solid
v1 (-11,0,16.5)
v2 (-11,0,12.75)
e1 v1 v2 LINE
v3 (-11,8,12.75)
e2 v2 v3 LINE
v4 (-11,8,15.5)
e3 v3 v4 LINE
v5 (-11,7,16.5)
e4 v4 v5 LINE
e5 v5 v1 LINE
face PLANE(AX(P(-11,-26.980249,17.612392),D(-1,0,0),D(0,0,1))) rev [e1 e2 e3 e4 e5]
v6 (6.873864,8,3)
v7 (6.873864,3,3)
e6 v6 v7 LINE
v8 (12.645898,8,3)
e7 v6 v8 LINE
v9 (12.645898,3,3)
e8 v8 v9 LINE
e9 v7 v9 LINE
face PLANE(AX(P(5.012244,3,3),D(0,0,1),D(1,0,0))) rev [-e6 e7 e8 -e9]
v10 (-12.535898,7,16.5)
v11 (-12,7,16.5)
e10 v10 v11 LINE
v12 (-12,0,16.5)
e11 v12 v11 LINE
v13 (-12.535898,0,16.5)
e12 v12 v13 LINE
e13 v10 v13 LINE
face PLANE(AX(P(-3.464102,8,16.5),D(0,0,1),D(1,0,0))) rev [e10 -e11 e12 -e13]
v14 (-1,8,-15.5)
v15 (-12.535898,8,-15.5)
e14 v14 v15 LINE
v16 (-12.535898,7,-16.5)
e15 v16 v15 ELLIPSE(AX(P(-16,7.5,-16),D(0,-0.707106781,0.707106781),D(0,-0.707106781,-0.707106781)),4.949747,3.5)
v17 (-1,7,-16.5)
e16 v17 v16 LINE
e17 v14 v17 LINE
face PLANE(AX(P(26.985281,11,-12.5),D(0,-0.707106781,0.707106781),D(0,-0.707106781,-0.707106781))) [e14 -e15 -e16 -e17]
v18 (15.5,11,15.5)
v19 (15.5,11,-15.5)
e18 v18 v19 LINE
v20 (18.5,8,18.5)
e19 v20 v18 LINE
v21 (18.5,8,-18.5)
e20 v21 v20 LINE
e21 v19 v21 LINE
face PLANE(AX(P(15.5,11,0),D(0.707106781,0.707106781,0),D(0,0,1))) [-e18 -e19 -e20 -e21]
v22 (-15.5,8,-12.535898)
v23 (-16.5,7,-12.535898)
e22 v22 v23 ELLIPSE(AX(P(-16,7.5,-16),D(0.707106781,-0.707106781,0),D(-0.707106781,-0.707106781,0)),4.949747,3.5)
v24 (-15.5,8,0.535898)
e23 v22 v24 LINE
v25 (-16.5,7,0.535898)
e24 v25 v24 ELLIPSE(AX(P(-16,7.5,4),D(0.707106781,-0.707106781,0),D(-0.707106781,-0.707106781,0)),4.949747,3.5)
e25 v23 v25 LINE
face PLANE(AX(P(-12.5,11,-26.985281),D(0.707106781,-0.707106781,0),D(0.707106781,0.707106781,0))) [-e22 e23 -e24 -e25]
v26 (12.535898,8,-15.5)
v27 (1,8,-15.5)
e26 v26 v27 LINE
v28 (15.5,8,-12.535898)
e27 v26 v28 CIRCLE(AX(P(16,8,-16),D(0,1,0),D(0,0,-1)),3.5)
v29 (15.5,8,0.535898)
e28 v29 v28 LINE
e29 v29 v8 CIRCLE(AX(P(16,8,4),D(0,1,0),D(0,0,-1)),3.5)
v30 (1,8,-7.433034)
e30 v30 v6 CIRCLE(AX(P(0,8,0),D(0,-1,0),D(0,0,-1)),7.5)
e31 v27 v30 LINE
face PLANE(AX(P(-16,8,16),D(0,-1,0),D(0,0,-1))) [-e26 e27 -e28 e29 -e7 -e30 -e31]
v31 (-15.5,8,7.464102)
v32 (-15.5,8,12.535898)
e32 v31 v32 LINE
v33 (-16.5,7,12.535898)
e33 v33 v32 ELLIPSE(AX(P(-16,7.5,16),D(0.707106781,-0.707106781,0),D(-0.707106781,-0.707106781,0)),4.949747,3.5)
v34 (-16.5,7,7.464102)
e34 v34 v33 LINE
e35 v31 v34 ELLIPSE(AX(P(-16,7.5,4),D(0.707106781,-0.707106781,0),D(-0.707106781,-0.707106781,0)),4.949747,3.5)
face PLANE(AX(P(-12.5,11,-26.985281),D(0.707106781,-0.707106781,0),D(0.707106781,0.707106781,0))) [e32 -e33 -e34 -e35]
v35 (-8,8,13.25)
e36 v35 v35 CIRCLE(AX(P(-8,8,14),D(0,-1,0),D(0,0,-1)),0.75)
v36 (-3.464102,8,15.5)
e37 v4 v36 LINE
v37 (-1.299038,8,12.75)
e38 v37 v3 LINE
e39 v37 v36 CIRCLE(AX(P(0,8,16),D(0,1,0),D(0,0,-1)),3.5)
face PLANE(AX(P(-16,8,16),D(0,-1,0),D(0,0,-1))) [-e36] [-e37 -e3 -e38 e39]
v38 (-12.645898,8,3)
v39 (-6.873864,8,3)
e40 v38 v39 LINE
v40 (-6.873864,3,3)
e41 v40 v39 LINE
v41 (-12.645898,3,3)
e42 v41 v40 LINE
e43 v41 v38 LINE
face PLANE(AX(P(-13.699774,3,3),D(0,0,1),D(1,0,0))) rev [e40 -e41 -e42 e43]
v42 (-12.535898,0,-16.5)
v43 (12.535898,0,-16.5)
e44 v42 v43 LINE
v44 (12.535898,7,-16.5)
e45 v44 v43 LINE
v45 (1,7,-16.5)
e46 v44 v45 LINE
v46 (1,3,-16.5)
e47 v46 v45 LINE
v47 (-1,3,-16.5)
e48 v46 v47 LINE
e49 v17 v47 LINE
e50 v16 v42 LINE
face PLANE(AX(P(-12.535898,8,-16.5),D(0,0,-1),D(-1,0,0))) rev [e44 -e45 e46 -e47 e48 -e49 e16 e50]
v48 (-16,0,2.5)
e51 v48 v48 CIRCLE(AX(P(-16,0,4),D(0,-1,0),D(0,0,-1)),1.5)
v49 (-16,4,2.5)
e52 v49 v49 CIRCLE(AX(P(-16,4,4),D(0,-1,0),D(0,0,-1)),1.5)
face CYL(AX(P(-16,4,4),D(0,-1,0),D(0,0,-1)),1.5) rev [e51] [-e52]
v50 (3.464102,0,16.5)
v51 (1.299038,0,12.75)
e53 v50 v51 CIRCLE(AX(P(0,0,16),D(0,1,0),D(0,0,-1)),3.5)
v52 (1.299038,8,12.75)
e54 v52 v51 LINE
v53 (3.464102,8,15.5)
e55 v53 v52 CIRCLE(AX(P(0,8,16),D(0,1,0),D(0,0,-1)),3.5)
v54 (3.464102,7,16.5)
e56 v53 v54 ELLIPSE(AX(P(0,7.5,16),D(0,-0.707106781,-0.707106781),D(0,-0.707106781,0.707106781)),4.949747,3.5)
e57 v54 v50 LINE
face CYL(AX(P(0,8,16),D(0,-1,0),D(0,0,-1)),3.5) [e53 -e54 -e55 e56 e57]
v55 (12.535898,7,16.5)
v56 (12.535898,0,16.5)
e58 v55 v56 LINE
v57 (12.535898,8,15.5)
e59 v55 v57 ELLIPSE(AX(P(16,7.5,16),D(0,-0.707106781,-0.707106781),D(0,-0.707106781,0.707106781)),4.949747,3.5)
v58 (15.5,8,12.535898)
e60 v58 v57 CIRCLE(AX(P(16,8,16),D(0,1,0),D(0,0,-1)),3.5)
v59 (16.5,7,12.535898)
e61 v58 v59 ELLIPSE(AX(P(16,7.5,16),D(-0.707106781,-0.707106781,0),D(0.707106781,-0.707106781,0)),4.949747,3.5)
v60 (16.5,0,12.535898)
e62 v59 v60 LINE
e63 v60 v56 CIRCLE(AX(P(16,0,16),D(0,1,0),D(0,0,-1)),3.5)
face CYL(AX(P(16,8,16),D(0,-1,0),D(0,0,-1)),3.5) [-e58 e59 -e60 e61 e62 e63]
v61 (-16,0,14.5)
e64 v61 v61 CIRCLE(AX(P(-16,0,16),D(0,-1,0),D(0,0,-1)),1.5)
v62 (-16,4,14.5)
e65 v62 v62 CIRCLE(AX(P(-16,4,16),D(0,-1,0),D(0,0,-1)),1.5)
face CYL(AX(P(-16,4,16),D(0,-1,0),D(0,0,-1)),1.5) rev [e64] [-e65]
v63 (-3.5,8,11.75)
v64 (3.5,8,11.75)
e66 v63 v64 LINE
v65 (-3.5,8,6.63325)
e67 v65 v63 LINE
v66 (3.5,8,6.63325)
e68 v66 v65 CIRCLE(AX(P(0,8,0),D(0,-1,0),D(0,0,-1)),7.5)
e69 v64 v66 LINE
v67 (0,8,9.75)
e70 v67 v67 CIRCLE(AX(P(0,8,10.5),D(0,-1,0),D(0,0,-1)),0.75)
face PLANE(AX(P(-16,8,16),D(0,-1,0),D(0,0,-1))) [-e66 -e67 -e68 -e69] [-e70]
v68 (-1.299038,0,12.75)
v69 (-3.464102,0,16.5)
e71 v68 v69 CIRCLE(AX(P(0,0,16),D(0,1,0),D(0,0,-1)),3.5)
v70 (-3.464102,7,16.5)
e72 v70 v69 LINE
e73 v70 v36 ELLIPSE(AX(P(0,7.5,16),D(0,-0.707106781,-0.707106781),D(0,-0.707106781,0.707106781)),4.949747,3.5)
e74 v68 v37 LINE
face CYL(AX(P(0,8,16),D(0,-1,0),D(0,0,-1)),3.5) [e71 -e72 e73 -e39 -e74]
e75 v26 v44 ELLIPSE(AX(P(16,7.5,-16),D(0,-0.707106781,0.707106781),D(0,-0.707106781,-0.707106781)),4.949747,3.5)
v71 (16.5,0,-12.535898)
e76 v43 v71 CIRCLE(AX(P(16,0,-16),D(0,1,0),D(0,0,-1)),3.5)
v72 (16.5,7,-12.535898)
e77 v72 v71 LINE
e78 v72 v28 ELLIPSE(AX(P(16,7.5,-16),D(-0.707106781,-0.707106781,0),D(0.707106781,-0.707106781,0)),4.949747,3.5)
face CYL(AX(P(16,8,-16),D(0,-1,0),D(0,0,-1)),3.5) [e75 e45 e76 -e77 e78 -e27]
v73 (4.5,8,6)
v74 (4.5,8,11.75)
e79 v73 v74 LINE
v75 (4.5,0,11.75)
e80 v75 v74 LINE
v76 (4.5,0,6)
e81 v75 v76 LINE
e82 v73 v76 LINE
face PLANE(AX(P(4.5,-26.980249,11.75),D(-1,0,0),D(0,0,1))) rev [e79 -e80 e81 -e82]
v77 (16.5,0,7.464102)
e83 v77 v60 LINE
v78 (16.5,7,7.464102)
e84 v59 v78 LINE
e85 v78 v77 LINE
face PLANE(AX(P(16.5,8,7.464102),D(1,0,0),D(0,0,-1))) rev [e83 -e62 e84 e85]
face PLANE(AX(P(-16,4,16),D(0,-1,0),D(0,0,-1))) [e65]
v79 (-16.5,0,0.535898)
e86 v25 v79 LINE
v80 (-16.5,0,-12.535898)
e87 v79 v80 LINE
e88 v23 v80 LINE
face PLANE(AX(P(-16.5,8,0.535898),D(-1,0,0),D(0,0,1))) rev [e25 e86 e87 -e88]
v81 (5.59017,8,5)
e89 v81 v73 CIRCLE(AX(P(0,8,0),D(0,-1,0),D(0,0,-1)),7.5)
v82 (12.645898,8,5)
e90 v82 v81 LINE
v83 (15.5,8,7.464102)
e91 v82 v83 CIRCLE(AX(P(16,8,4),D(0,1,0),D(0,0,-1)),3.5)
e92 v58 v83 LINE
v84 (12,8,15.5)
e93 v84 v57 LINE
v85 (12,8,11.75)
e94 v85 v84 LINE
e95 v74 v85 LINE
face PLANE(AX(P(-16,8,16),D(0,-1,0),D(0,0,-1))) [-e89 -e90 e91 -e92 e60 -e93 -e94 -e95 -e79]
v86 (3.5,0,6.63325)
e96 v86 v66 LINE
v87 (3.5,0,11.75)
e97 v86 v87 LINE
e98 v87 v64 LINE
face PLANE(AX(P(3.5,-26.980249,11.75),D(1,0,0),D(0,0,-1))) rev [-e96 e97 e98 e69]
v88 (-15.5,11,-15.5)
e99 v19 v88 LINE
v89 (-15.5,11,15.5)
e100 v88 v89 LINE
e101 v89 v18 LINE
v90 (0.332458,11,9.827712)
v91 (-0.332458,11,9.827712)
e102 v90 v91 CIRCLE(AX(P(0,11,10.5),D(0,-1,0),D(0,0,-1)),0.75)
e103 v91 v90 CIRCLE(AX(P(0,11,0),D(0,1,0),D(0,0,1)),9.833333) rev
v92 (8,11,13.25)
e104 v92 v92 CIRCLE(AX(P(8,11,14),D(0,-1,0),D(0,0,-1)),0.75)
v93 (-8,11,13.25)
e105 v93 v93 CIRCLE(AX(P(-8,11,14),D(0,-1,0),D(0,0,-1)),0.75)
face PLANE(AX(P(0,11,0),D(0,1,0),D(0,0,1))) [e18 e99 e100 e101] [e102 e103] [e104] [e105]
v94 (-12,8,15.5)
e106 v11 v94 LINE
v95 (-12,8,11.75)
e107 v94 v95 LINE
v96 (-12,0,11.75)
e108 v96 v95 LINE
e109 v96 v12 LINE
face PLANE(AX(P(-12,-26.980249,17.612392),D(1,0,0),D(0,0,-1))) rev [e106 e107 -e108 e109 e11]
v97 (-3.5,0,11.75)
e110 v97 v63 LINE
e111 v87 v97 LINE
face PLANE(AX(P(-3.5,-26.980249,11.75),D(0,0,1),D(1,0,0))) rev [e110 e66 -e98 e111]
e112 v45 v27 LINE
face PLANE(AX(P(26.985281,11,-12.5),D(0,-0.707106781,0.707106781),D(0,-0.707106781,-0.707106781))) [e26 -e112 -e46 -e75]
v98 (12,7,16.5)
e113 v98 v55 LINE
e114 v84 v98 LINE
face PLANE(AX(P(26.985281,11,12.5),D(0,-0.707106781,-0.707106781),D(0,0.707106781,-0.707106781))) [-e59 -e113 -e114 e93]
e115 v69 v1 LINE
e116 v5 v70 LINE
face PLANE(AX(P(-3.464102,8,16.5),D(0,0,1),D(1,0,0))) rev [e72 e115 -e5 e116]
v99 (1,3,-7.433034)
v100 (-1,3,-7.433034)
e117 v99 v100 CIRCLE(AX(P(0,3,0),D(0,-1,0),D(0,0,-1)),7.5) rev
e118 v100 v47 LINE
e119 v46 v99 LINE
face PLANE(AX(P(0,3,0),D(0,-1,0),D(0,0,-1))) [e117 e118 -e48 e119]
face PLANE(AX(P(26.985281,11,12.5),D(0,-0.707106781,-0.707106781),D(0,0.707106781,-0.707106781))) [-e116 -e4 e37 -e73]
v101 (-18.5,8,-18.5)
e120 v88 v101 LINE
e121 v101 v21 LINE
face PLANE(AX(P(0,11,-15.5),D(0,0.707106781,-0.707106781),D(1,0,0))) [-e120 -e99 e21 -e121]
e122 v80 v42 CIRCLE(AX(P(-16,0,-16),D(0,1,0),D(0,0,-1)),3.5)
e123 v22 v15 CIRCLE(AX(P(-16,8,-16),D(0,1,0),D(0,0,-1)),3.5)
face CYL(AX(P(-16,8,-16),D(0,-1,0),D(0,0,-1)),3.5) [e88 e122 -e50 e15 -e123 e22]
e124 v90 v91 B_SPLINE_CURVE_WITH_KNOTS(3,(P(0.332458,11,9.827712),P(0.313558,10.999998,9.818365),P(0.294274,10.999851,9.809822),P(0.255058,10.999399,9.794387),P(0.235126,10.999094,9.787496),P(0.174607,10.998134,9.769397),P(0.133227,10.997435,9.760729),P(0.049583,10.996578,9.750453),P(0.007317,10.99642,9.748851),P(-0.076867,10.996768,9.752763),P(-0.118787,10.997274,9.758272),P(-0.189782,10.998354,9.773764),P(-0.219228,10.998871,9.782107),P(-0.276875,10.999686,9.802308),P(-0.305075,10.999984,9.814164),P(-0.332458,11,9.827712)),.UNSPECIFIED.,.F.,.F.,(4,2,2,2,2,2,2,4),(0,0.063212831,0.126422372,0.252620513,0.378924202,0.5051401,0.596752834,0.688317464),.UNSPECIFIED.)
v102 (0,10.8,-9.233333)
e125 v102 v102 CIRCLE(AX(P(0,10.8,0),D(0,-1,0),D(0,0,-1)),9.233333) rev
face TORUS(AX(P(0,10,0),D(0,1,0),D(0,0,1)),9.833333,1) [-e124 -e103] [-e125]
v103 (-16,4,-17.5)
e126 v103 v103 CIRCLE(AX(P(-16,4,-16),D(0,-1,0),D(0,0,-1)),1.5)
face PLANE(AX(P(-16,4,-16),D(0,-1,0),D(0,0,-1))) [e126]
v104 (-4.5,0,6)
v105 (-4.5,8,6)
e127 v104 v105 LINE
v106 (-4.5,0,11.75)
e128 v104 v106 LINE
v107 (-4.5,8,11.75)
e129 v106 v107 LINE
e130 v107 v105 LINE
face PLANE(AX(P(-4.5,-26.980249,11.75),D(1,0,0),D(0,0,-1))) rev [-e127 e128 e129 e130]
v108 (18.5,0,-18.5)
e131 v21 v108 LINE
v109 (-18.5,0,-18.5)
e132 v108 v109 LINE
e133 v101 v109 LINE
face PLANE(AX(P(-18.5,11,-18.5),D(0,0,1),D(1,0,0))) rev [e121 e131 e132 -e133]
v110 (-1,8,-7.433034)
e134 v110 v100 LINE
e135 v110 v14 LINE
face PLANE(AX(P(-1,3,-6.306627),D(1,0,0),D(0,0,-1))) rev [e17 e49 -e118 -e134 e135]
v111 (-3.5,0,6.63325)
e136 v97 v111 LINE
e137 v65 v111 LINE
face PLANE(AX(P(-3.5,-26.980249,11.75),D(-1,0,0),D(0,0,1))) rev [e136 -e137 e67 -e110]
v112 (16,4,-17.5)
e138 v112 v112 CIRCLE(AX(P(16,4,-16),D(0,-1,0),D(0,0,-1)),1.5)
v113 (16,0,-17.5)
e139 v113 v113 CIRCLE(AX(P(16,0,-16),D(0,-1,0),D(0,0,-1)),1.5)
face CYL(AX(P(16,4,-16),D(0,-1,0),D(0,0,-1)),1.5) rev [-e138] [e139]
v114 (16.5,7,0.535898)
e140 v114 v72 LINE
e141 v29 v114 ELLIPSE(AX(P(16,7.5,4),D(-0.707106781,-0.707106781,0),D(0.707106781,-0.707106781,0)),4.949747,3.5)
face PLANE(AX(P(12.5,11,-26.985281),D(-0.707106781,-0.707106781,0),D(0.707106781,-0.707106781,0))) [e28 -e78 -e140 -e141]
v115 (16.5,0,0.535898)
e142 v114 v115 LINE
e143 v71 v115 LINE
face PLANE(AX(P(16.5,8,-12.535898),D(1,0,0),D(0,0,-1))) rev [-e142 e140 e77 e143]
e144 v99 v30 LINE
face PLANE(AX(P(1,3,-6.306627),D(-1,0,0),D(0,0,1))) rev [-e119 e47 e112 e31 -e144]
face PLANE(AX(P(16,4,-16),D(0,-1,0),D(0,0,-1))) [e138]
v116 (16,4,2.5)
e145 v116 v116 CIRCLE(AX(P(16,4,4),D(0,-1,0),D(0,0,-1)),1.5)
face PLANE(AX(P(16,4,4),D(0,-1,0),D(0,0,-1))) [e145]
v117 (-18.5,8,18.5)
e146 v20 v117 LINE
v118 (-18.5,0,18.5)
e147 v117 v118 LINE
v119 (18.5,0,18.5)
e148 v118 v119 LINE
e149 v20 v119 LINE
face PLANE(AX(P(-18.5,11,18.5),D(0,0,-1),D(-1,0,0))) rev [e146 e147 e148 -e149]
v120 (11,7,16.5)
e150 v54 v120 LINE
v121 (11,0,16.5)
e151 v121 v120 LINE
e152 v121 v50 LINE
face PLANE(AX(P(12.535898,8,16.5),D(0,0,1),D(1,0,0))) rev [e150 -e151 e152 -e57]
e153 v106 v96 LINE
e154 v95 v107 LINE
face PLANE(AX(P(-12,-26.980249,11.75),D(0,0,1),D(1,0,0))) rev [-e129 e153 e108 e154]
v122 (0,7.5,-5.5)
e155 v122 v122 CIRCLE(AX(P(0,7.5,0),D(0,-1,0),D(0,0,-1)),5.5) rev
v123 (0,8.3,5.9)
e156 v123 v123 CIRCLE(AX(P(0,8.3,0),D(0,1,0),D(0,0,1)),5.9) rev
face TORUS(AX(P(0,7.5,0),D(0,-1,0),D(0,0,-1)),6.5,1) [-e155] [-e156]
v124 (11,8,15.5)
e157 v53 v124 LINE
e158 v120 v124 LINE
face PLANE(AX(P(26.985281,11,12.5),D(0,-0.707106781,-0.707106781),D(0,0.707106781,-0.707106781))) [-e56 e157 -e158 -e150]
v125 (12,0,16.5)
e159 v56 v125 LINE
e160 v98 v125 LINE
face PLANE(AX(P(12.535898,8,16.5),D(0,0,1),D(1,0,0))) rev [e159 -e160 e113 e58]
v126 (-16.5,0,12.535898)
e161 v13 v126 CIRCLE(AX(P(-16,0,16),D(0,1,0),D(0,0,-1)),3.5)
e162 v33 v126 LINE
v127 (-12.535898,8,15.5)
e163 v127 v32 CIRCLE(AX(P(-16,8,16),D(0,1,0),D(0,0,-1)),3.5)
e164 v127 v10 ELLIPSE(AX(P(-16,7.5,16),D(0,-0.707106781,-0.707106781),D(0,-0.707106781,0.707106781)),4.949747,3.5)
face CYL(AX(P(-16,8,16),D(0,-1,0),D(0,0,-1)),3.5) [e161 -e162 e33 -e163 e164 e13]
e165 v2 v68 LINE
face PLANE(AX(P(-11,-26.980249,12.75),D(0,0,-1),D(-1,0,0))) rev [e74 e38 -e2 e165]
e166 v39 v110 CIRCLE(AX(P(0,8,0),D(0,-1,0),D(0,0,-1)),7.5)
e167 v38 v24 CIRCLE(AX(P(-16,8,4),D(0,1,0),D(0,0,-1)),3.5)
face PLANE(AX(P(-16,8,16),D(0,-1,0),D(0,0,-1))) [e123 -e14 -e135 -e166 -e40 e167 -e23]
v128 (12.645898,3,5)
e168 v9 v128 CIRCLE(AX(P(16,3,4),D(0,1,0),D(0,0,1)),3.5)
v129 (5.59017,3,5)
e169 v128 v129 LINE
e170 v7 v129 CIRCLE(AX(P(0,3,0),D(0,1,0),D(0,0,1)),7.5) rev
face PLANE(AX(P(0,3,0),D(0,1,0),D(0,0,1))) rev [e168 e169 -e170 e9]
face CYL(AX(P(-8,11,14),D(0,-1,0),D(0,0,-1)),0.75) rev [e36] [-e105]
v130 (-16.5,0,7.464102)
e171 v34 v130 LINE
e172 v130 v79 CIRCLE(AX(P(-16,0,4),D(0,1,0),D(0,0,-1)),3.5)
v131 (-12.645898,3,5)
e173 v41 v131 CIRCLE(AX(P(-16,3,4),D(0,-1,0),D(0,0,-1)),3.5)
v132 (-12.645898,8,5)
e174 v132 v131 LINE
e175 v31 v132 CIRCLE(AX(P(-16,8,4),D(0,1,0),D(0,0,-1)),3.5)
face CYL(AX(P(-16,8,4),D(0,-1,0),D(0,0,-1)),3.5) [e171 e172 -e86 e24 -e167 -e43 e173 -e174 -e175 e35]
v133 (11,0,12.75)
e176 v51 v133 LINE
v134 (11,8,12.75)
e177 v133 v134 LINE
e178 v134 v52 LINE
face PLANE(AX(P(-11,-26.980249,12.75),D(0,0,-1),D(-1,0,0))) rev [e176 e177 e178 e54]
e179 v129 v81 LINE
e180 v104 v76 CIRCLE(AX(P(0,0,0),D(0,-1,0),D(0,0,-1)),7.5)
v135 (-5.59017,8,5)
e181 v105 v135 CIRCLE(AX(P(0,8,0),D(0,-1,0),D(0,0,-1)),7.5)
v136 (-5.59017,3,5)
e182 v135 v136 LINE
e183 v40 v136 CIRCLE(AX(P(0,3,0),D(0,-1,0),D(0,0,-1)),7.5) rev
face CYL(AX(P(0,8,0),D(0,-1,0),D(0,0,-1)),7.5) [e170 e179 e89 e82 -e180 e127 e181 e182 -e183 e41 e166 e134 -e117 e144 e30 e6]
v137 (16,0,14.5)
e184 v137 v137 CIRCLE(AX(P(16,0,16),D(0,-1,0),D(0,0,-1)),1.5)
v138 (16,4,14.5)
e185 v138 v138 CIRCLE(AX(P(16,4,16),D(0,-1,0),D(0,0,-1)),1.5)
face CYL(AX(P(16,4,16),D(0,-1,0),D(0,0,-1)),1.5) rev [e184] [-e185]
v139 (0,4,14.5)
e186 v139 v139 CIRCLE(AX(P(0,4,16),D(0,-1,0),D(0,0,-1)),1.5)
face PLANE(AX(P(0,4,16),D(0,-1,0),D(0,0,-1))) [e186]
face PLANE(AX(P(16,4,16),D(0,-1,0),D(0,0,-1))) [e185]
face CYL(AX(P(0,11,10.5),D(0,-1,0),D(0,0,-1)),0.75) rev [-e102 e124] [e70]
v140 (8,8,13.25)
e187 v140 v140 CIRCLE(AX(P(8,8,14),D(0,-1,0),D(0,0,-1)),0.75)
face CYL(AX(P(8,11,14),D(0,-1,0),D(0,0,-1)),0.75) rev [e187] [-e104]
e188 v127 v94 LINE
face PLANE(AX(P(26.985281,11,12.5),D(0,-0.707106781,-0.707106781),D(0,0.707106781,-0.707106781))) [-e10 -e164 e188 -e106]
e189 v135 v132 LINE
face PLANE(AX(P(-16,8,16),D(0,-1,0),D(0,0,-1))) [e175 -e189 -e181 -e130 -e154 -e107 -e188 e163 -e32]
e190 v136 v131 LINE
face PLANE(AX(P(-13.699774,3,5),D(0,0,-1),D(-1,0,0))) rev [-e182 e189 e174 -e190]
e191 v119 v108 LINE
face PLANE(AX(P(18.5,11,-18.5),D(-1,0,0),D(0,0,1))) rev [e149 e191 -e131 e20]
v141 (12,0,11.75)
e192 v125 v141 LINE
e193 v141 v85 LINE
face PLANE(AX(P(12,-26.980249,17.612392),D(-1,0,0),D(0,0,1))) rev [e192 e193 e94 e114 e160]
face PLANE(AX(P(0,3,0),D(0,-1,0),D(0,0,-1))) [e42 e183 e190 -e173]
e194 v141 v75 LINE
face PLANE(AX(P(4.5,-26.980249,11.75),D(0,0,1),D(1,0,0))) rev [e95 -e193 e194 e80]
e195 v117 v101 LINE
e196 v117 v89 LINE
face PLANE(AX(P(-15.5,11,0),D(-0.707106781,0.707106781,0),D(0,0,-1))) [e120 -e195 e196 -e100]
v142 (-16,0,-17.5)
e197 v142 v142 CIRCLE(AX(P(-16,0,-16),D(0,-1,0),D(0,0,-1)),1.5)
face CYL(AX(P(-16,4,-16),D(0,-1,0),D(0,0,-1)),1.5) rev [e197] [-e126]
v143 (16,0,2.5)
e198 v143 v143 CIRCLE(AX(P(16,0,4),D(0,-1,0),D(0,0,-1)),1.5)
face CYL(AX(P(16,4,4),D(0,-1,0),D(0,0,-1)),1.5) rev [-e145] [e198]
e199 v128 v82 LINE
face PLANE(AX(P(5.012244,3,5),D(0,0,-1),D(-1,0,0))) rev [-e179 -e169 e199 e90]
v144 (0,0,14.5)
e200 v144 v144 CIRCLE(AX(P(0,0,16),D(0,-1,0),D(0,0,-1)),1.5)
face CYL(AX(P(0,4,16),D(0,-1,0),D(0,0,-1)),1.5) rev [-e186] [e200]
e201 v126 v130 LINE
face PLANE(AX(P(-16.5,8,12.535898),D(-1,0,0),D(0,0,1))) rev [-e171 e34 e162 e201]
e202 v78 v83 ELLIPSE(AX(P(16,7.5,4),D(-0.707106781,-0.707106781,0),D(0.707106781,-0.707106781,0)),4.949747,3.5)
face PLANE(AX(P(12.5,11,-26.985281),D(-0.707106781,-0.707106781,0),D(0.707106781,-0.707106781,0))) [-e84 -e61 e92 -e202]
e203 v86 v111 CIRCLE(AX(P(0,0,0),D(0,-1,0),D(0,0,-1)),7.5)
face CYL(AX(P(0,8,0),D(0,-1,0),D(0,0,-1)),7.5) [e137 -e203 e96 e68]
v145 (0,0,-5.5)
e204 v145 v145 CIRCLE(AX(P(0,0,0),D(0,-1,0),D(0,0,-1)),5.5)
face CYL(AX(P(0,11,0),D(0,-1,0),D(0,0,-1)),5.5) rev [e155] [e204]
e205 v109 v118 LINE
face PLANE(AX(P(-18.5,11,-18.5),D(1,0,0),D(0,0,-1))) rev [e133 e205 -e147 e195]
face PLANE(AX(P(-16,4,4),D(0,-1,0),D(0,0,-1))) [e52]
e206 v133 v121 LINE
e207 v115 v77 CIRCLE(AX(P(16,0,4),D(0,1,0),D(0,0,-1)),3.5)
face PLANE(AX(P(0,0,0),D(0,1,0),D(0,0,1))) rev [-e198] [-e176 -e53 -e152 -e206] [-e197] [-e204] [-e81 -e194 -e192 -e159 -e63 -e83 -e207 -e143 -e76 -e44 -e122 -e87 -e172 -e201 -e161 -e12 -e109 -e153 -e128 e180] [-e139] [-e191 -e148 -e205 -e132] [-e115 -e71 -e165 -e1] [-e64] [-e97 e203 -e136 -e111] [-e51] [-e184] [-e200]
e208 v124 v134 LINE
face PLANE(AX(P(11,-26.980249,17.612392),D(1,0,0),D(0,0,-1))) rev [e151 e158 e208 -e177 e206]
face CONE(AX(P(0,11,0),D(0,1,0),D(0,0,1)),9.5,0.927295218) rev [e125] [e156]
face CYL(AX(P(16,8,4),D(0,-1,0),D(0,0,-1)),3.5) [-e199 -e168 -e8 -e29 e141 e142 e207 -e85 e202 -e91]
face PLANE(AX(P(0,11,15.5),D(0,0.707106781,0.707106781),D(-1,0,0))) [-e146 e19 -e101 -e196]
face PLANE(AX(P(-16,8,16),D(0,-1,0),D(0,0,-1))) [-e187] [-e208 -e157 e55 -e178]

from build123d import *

# Parameters (mm, degrees)
SKETCH_1_W          = 37
SKETCH_1_H          = 37
EXTRUDE_1_DEPTH     = 11
SKETCH_2_R          = 1.5
CUT_EXTRUDE_1_DEPTH = 4
SKETCH_3_R          = 5.5
CUT_EXTRUDE_2_DEPTH = 29.381331893
SKETCH_4_R          = 7.5
CUT_EXTRUDE_4_DEPTH = 8
SKETCH_5_R          = 0.75
CUT_EXTRUDE_5_DEPTH = 28.358728041
SKETCH_7_W          = 8.873163899
SKETCH_7_H          = 2
SKETCH_7_W_2        = 8.897226177
SKETCH_7_W_3        = 2
SKETCH_7_H_2        = 11.172985464
EXTRUDE_3_DEPTH     = 5
EXTRUDE_6_DEPTH     = 8
EXTRUDE_7_REACH     = 44.805
EXTRUDE_8_REACH     = 44.805
CHAMFER_2_SIZE      = 3
SKETCH_11_R         = 0.75
CUT_EXTRUDE_6_DEPTH = 28.358728041
CHAMFER_3_SIZE      = 3
CHAMFER_3_SIZE2     = 4
FILLET_1_R          = 1
FILLET_2_R          = 1


with BuildPart() as part:
    # 草图1 → 凸台-拉伸1 (new body)
    with BuildSketch(Plane(origin=(0, 0, 0), x_dir=(1, 0, 0), z_dir=(0, 1, 0))):
        Rectangle(SKETCH_1_W, SKETCH_1_H)
    extrude(amount=EXTRUDE_1_DEPTH)

    # 草图2 → 切除-拉伸1 (cut)
    with BuildSketch(Plane.XZ):
        with Locations(Location((-16, 16, 0), (0, 0, 270))):
            Circle(SKETCH_2_R)
        with Locations(Location((-16, -16, 0), (0, 0, 270))):
            Circle(SKETCH_2_R)
        with Locations(Location((16, 16, 0), (0, 0, 270))):
            Circle(SKETCH_2_R)
        with Locations(Location((16, -16, 0), (0, 0, 270))):
            Circle(SKETCH_2_R)
        with Locations(Location((16, 4, 0), (0, 0, 270))):
            Circle(SKETCH_2_R)
        with Locations(Location((-16, 4, 0), (0, 0, 270))):
            Circle(SKETCH_2_R)
        with Locations(Location((0, 16, 0), (0, 0, 270))):
            Circle(SKETCH_2_R)
    extrude(amount=-CUT_EXTRUDE_1_DEPTH, mode=Mode.SUBTRACT)

    # 草图3 → 切除-拉伸2 (cut, through all)
    with BuildSketch(Plane.XZ):
        with Locations(Location((0, 0, 0), (0, 0, 270))):
            Circle(SKETCH_3_R)
    extrude(amount=-CUT_EXTRUDE_2_DEPTH, mode=Mode.SUBTRACT)

    # 草图4 → 切除-拉伸4 (cut)
    with BuildSketch(Plane.XZ):
        with BuildLine():
            Line((-16.5, 0.535898385), (-16.5, -12.535898385))
            ThreePointArc((-16.5, -12.535898385), (-13.525126266, -13.525126266), (-12.535898385, -16.5))
            Line((-12.535898385, -16.5), (12.535898385, -16.5))
            ThreePointArc((12.535898385, -16.5), (13.525126266, -13.525126266), (16.5, -12.535898385))
            Line((16.5, -12.535898385), (16.5, 0.535898385))
            ThreePointArc((16.5, 0.535898385), (12.5, 4), (16.5, 7.464101615))
            Line((16.5, 7.464101615), (16.5, 12.535898385))
            ThreePointArc((16.5, 12.535898385), (13.525126266, 13.525126266), (12.535898385, 16.5))
            Line((12.535898385, 16.5), (3.464101615, 16.5))
            ThreePointArc((3.464101615, 16.5), (0, 12.5), (-3.464101615, 16.5))
            Line((-3.464101615, 16.5), (-12.535898385, 16.5))
            ThreePointArc((-12.535898385, 16.5), (-13.525126266, 13.525126266), (-16.5, 12.535898385))
            Line((-16.5, 12.535898385), (-16.5, 7.464101615))
            ThreePointArc((-16.5, 7.464101615), (-12.5, 4), (-16.5, 0.535898385))
        make_face()
        with Locations(Location((0, 0, 0), (0, 0, 270))):
            Circle(SKETCH_4_R, mode=Mode.SUBTRACT)
    extrude(amount=-CUT_EXTRUDE_4_DEPTH, mode=Mode.SUBTRACT)

    # 草图5 → 切除-拉伸5 (cut, through all)
    with BuildSketch(Plane.XZ.offset(-8)):
        with Locations(Location((-8, 14, 0), (0, 0, 270))):
            Circle(SKETCH_5_R)
        with Locations(Location((0, 10.5, 0), (0, 0, 270))):
            Circle(SKETCH_5_R)
        with Locations(Location((8, 14, 0), (0, 0, 270))):
            Circle(SKETCH_5_R)
    extrude(amount=-CUT_EXTRUDE_5_DEPTH, mode=Mode.SUBTRACT)

    # 草图7 → 凸台-拉伸3 (add)
    with BuildSketch(Plane.XZ.offset(-8)):
        with Locations((-9.263191889, 4)):
            Rectangle(SKETCH_7_W, SKETCH_7_H)
        with Locations((9.460856753, 4)):
            Rectangle(SKETCH_7_W_2, SKETCH_7_H)
        with Locations((0, -11.893119293)):
            Rectangle(SKETCH_7_W_3, SKETCH_7_H_2)
    extrude(amount=EXTRUDE_3_DEPTH)

    # 草图6 → 凸台-拉伸6 (add)
    with BuildSketch(Plane.XZ.offset(-8)):
        Polygon((-11, 12.75), (-3.5, 12.75), (3.5, 12.75), (11, 12.75), (11, 17.612391956), (12, 17.612391956), (12, 11.75), (4.5, 11.75), (4.5, 5.286247788), (3.5, 5.286247788), (3.5, 11.75), (-3.5, 11.75), (-3.5, 5.286247788), (-4.5, 5.286247788), (-4.5, 11.75), (-12, 11.75), (-12, 17.612391956), (-11, 17.612391956), align=None)
    extrude(amount=EXTRUDE_6_DEPTH)

    # 凸台-拉伸7: up to this face of the body (flat: up to its plane)
    extrude_7_end = Plane(part.part.faces().sort_by_distance((0, 5.5, -18.5))[0])
    # 草图9 → 凸台-拉伸7 (add, up to the picked face)
    with BuildSketch(Plane.XY.offset(18.5), mode=Mode.PRIVATE) as extrude_7_sk1:
        Polygon((-12.5, 11), (-18.5, 5), (-18.5, 11), align=None)
    extrude_7_tool1 = split(extrude(extrude_7_sk1.sketch, amount=-EXTRUDE_7_REACH, mode=Mode.PRIVATE), bisect_by=extrude_7_end, keep=Keep.BOTH, mode=Mode.PRIVATE)
    # 草图9 → 凸台-拉伸7 (add, up to the picked face)
    with BuildSketch(Plane.XY.offset(18.5), mode=Mode.PRIVATE) as extrude_7_sk2:
        Polygon((18.5, 11), (12.5, 11), (18.5, 5), align=None)
    extrude_7_tool2 = split(extrude(extrude_7_sk2.sketch, amount=-EXTRUDE_7_REACH, mode=Mode.PRIVATE), bisect_by=extrude_7_end, keep=Keep.BOTH, mode=Mode.PRIVATE)
    add(extrude_7_tool1.solids().sort_by(Axis((-16.5, 9, 18.5), (0, 0, -1)))[0])
    add(extrude_7_tool2.solids().sort_by(Axis((16.5, 9, 18.5), (0, 0, -1)))[0])

    # 凸台-拉伸8: up to this face of the body (flat: up to its plane)
    extrude_8_end = Plane(part.part.faces().sort_by_distance((18.5, 5.5, 0))[0])
    # 草图10 → 凸台-拉伸8 (add, up to the picked face)
    with BuildSketch(Plane.ZY.offset(18.5), mode=Mode.PRIVATE) as extrude_8_sk1:
        Polygon((-12.5, 11), (-18.5, 5), (-18.5, 11), align=None)
    extrude_8_tool1 = split(extrude(extrude_8_sk1.sketch, amount=-EXTRUDE_8_REACH, mode=Mode.PRIVATE), bisect_by=extrude_8_end, keep=Keep.BOTH, mode=Mode.PRIVATE)
    # 草图10 → 凸台-拉伸8 (add, up to the picked face)
    with BuildSketch(Plane.ZY.offset(18.5), mode=Mode.PRIVATE) as extrude_8_sk2:
        Polygon((18.5, 11), (12.5, 11), (18.5, 5), align=None)
    extrude_8_tool2 = split(extrude(extrude_8_sk2.sketch, amount=-EXTRUDE_8_REACH, mode=Mode.PRIVATE), bisect_by=extrude_8_end, keep=Keep.BOTH, mode=Mode.PRIVATE)
    add(extrude_8_tool1.solids().sort_by(Axis((-18.5, 9, -16.5), (1, 0, 0)))[0])
    add(extrude_8_tool2.solids().sort_by(Axis((-18.5, 9, 16.5), (1, 0, 0)))[0])

    # 倒角2
    chamfer_2_edges = [part.edges().sort_by_distance(p)[0] for p in [
        (-18.5, 11, 0),
        (0, 11, 18.5),
        (18.5, 11, 0),
        (0, 11, -18.5),
    ]]
    chamfer(chamfer_2_edges, length=CHAMFER_2_SIZE)

    # 草图11 → 切除-拉伸6 (cut, through all)
    with BuildSketch(Plane.XZ.offset(-8)):
        with Locations(Location((8, 14, 0), (0, 0, 270))):
            Circle(SKETCH_11_R)
        with Locations(Location((-8, 14, 0), (0, 0, 270))):
            Circle(SKETCH_11_R)
    extrude(amount=-CUT_EXTRUDE_6_DEPTH, mode=Mode.SUBTRACT)

    # 倒角3
    chamfer_3_edges = [part.edges().sort_by_distance(p)[0] for p in [
        (0, 11, 5.5),
    ]]
    chamfer_3_side = [part.faces().sort_by_distance(p)[0] for p in [
        (0, 5.5, 5.5),
    ]]
    chamfer(chamfer_3_edges, length=CHAMFER_3_SIZE, length2=CHAMFER_3_SIZE2, reference=chamfer_3_side[0])

    # 圆角1
    # the kernel refuses this fillet: 1 mm, written as the material it takes off along each edge
    with BuildSketch(Plane(origin=(0, 11, 0), x_dir=(0, 0, -1), z_dir=(-1, 0, 0))) as fillet_1_piece_1:
        with BuildLine():
            CenterArc((9.5 + FILLET_1_R * 0.333333333333, FILLET_1_R), FILLET_1_R, 233.130102354, 36.869897646)
            Line((9.5 - FILLET_1_R * 0.266666666667, FILLET_1_R * 0.2), (9.5, 0))
            Line((9.5, 0), (9.5 + FILLET_1_R * 0.333333333333, 0))
        make_face()
    revolve(axis=Axis((0, 11, 0), (0, -1, 0)), mode=Mode.SUBTRACT)

    # 圆角2
    fillet_2_edges = [part.edges().sort_by_distance(p)[0] for p in [
        (0, 8, 5.5),
    ]]
    fillet(fillet_2_edges, radius=FILLET_2_R)


solid = part.part
